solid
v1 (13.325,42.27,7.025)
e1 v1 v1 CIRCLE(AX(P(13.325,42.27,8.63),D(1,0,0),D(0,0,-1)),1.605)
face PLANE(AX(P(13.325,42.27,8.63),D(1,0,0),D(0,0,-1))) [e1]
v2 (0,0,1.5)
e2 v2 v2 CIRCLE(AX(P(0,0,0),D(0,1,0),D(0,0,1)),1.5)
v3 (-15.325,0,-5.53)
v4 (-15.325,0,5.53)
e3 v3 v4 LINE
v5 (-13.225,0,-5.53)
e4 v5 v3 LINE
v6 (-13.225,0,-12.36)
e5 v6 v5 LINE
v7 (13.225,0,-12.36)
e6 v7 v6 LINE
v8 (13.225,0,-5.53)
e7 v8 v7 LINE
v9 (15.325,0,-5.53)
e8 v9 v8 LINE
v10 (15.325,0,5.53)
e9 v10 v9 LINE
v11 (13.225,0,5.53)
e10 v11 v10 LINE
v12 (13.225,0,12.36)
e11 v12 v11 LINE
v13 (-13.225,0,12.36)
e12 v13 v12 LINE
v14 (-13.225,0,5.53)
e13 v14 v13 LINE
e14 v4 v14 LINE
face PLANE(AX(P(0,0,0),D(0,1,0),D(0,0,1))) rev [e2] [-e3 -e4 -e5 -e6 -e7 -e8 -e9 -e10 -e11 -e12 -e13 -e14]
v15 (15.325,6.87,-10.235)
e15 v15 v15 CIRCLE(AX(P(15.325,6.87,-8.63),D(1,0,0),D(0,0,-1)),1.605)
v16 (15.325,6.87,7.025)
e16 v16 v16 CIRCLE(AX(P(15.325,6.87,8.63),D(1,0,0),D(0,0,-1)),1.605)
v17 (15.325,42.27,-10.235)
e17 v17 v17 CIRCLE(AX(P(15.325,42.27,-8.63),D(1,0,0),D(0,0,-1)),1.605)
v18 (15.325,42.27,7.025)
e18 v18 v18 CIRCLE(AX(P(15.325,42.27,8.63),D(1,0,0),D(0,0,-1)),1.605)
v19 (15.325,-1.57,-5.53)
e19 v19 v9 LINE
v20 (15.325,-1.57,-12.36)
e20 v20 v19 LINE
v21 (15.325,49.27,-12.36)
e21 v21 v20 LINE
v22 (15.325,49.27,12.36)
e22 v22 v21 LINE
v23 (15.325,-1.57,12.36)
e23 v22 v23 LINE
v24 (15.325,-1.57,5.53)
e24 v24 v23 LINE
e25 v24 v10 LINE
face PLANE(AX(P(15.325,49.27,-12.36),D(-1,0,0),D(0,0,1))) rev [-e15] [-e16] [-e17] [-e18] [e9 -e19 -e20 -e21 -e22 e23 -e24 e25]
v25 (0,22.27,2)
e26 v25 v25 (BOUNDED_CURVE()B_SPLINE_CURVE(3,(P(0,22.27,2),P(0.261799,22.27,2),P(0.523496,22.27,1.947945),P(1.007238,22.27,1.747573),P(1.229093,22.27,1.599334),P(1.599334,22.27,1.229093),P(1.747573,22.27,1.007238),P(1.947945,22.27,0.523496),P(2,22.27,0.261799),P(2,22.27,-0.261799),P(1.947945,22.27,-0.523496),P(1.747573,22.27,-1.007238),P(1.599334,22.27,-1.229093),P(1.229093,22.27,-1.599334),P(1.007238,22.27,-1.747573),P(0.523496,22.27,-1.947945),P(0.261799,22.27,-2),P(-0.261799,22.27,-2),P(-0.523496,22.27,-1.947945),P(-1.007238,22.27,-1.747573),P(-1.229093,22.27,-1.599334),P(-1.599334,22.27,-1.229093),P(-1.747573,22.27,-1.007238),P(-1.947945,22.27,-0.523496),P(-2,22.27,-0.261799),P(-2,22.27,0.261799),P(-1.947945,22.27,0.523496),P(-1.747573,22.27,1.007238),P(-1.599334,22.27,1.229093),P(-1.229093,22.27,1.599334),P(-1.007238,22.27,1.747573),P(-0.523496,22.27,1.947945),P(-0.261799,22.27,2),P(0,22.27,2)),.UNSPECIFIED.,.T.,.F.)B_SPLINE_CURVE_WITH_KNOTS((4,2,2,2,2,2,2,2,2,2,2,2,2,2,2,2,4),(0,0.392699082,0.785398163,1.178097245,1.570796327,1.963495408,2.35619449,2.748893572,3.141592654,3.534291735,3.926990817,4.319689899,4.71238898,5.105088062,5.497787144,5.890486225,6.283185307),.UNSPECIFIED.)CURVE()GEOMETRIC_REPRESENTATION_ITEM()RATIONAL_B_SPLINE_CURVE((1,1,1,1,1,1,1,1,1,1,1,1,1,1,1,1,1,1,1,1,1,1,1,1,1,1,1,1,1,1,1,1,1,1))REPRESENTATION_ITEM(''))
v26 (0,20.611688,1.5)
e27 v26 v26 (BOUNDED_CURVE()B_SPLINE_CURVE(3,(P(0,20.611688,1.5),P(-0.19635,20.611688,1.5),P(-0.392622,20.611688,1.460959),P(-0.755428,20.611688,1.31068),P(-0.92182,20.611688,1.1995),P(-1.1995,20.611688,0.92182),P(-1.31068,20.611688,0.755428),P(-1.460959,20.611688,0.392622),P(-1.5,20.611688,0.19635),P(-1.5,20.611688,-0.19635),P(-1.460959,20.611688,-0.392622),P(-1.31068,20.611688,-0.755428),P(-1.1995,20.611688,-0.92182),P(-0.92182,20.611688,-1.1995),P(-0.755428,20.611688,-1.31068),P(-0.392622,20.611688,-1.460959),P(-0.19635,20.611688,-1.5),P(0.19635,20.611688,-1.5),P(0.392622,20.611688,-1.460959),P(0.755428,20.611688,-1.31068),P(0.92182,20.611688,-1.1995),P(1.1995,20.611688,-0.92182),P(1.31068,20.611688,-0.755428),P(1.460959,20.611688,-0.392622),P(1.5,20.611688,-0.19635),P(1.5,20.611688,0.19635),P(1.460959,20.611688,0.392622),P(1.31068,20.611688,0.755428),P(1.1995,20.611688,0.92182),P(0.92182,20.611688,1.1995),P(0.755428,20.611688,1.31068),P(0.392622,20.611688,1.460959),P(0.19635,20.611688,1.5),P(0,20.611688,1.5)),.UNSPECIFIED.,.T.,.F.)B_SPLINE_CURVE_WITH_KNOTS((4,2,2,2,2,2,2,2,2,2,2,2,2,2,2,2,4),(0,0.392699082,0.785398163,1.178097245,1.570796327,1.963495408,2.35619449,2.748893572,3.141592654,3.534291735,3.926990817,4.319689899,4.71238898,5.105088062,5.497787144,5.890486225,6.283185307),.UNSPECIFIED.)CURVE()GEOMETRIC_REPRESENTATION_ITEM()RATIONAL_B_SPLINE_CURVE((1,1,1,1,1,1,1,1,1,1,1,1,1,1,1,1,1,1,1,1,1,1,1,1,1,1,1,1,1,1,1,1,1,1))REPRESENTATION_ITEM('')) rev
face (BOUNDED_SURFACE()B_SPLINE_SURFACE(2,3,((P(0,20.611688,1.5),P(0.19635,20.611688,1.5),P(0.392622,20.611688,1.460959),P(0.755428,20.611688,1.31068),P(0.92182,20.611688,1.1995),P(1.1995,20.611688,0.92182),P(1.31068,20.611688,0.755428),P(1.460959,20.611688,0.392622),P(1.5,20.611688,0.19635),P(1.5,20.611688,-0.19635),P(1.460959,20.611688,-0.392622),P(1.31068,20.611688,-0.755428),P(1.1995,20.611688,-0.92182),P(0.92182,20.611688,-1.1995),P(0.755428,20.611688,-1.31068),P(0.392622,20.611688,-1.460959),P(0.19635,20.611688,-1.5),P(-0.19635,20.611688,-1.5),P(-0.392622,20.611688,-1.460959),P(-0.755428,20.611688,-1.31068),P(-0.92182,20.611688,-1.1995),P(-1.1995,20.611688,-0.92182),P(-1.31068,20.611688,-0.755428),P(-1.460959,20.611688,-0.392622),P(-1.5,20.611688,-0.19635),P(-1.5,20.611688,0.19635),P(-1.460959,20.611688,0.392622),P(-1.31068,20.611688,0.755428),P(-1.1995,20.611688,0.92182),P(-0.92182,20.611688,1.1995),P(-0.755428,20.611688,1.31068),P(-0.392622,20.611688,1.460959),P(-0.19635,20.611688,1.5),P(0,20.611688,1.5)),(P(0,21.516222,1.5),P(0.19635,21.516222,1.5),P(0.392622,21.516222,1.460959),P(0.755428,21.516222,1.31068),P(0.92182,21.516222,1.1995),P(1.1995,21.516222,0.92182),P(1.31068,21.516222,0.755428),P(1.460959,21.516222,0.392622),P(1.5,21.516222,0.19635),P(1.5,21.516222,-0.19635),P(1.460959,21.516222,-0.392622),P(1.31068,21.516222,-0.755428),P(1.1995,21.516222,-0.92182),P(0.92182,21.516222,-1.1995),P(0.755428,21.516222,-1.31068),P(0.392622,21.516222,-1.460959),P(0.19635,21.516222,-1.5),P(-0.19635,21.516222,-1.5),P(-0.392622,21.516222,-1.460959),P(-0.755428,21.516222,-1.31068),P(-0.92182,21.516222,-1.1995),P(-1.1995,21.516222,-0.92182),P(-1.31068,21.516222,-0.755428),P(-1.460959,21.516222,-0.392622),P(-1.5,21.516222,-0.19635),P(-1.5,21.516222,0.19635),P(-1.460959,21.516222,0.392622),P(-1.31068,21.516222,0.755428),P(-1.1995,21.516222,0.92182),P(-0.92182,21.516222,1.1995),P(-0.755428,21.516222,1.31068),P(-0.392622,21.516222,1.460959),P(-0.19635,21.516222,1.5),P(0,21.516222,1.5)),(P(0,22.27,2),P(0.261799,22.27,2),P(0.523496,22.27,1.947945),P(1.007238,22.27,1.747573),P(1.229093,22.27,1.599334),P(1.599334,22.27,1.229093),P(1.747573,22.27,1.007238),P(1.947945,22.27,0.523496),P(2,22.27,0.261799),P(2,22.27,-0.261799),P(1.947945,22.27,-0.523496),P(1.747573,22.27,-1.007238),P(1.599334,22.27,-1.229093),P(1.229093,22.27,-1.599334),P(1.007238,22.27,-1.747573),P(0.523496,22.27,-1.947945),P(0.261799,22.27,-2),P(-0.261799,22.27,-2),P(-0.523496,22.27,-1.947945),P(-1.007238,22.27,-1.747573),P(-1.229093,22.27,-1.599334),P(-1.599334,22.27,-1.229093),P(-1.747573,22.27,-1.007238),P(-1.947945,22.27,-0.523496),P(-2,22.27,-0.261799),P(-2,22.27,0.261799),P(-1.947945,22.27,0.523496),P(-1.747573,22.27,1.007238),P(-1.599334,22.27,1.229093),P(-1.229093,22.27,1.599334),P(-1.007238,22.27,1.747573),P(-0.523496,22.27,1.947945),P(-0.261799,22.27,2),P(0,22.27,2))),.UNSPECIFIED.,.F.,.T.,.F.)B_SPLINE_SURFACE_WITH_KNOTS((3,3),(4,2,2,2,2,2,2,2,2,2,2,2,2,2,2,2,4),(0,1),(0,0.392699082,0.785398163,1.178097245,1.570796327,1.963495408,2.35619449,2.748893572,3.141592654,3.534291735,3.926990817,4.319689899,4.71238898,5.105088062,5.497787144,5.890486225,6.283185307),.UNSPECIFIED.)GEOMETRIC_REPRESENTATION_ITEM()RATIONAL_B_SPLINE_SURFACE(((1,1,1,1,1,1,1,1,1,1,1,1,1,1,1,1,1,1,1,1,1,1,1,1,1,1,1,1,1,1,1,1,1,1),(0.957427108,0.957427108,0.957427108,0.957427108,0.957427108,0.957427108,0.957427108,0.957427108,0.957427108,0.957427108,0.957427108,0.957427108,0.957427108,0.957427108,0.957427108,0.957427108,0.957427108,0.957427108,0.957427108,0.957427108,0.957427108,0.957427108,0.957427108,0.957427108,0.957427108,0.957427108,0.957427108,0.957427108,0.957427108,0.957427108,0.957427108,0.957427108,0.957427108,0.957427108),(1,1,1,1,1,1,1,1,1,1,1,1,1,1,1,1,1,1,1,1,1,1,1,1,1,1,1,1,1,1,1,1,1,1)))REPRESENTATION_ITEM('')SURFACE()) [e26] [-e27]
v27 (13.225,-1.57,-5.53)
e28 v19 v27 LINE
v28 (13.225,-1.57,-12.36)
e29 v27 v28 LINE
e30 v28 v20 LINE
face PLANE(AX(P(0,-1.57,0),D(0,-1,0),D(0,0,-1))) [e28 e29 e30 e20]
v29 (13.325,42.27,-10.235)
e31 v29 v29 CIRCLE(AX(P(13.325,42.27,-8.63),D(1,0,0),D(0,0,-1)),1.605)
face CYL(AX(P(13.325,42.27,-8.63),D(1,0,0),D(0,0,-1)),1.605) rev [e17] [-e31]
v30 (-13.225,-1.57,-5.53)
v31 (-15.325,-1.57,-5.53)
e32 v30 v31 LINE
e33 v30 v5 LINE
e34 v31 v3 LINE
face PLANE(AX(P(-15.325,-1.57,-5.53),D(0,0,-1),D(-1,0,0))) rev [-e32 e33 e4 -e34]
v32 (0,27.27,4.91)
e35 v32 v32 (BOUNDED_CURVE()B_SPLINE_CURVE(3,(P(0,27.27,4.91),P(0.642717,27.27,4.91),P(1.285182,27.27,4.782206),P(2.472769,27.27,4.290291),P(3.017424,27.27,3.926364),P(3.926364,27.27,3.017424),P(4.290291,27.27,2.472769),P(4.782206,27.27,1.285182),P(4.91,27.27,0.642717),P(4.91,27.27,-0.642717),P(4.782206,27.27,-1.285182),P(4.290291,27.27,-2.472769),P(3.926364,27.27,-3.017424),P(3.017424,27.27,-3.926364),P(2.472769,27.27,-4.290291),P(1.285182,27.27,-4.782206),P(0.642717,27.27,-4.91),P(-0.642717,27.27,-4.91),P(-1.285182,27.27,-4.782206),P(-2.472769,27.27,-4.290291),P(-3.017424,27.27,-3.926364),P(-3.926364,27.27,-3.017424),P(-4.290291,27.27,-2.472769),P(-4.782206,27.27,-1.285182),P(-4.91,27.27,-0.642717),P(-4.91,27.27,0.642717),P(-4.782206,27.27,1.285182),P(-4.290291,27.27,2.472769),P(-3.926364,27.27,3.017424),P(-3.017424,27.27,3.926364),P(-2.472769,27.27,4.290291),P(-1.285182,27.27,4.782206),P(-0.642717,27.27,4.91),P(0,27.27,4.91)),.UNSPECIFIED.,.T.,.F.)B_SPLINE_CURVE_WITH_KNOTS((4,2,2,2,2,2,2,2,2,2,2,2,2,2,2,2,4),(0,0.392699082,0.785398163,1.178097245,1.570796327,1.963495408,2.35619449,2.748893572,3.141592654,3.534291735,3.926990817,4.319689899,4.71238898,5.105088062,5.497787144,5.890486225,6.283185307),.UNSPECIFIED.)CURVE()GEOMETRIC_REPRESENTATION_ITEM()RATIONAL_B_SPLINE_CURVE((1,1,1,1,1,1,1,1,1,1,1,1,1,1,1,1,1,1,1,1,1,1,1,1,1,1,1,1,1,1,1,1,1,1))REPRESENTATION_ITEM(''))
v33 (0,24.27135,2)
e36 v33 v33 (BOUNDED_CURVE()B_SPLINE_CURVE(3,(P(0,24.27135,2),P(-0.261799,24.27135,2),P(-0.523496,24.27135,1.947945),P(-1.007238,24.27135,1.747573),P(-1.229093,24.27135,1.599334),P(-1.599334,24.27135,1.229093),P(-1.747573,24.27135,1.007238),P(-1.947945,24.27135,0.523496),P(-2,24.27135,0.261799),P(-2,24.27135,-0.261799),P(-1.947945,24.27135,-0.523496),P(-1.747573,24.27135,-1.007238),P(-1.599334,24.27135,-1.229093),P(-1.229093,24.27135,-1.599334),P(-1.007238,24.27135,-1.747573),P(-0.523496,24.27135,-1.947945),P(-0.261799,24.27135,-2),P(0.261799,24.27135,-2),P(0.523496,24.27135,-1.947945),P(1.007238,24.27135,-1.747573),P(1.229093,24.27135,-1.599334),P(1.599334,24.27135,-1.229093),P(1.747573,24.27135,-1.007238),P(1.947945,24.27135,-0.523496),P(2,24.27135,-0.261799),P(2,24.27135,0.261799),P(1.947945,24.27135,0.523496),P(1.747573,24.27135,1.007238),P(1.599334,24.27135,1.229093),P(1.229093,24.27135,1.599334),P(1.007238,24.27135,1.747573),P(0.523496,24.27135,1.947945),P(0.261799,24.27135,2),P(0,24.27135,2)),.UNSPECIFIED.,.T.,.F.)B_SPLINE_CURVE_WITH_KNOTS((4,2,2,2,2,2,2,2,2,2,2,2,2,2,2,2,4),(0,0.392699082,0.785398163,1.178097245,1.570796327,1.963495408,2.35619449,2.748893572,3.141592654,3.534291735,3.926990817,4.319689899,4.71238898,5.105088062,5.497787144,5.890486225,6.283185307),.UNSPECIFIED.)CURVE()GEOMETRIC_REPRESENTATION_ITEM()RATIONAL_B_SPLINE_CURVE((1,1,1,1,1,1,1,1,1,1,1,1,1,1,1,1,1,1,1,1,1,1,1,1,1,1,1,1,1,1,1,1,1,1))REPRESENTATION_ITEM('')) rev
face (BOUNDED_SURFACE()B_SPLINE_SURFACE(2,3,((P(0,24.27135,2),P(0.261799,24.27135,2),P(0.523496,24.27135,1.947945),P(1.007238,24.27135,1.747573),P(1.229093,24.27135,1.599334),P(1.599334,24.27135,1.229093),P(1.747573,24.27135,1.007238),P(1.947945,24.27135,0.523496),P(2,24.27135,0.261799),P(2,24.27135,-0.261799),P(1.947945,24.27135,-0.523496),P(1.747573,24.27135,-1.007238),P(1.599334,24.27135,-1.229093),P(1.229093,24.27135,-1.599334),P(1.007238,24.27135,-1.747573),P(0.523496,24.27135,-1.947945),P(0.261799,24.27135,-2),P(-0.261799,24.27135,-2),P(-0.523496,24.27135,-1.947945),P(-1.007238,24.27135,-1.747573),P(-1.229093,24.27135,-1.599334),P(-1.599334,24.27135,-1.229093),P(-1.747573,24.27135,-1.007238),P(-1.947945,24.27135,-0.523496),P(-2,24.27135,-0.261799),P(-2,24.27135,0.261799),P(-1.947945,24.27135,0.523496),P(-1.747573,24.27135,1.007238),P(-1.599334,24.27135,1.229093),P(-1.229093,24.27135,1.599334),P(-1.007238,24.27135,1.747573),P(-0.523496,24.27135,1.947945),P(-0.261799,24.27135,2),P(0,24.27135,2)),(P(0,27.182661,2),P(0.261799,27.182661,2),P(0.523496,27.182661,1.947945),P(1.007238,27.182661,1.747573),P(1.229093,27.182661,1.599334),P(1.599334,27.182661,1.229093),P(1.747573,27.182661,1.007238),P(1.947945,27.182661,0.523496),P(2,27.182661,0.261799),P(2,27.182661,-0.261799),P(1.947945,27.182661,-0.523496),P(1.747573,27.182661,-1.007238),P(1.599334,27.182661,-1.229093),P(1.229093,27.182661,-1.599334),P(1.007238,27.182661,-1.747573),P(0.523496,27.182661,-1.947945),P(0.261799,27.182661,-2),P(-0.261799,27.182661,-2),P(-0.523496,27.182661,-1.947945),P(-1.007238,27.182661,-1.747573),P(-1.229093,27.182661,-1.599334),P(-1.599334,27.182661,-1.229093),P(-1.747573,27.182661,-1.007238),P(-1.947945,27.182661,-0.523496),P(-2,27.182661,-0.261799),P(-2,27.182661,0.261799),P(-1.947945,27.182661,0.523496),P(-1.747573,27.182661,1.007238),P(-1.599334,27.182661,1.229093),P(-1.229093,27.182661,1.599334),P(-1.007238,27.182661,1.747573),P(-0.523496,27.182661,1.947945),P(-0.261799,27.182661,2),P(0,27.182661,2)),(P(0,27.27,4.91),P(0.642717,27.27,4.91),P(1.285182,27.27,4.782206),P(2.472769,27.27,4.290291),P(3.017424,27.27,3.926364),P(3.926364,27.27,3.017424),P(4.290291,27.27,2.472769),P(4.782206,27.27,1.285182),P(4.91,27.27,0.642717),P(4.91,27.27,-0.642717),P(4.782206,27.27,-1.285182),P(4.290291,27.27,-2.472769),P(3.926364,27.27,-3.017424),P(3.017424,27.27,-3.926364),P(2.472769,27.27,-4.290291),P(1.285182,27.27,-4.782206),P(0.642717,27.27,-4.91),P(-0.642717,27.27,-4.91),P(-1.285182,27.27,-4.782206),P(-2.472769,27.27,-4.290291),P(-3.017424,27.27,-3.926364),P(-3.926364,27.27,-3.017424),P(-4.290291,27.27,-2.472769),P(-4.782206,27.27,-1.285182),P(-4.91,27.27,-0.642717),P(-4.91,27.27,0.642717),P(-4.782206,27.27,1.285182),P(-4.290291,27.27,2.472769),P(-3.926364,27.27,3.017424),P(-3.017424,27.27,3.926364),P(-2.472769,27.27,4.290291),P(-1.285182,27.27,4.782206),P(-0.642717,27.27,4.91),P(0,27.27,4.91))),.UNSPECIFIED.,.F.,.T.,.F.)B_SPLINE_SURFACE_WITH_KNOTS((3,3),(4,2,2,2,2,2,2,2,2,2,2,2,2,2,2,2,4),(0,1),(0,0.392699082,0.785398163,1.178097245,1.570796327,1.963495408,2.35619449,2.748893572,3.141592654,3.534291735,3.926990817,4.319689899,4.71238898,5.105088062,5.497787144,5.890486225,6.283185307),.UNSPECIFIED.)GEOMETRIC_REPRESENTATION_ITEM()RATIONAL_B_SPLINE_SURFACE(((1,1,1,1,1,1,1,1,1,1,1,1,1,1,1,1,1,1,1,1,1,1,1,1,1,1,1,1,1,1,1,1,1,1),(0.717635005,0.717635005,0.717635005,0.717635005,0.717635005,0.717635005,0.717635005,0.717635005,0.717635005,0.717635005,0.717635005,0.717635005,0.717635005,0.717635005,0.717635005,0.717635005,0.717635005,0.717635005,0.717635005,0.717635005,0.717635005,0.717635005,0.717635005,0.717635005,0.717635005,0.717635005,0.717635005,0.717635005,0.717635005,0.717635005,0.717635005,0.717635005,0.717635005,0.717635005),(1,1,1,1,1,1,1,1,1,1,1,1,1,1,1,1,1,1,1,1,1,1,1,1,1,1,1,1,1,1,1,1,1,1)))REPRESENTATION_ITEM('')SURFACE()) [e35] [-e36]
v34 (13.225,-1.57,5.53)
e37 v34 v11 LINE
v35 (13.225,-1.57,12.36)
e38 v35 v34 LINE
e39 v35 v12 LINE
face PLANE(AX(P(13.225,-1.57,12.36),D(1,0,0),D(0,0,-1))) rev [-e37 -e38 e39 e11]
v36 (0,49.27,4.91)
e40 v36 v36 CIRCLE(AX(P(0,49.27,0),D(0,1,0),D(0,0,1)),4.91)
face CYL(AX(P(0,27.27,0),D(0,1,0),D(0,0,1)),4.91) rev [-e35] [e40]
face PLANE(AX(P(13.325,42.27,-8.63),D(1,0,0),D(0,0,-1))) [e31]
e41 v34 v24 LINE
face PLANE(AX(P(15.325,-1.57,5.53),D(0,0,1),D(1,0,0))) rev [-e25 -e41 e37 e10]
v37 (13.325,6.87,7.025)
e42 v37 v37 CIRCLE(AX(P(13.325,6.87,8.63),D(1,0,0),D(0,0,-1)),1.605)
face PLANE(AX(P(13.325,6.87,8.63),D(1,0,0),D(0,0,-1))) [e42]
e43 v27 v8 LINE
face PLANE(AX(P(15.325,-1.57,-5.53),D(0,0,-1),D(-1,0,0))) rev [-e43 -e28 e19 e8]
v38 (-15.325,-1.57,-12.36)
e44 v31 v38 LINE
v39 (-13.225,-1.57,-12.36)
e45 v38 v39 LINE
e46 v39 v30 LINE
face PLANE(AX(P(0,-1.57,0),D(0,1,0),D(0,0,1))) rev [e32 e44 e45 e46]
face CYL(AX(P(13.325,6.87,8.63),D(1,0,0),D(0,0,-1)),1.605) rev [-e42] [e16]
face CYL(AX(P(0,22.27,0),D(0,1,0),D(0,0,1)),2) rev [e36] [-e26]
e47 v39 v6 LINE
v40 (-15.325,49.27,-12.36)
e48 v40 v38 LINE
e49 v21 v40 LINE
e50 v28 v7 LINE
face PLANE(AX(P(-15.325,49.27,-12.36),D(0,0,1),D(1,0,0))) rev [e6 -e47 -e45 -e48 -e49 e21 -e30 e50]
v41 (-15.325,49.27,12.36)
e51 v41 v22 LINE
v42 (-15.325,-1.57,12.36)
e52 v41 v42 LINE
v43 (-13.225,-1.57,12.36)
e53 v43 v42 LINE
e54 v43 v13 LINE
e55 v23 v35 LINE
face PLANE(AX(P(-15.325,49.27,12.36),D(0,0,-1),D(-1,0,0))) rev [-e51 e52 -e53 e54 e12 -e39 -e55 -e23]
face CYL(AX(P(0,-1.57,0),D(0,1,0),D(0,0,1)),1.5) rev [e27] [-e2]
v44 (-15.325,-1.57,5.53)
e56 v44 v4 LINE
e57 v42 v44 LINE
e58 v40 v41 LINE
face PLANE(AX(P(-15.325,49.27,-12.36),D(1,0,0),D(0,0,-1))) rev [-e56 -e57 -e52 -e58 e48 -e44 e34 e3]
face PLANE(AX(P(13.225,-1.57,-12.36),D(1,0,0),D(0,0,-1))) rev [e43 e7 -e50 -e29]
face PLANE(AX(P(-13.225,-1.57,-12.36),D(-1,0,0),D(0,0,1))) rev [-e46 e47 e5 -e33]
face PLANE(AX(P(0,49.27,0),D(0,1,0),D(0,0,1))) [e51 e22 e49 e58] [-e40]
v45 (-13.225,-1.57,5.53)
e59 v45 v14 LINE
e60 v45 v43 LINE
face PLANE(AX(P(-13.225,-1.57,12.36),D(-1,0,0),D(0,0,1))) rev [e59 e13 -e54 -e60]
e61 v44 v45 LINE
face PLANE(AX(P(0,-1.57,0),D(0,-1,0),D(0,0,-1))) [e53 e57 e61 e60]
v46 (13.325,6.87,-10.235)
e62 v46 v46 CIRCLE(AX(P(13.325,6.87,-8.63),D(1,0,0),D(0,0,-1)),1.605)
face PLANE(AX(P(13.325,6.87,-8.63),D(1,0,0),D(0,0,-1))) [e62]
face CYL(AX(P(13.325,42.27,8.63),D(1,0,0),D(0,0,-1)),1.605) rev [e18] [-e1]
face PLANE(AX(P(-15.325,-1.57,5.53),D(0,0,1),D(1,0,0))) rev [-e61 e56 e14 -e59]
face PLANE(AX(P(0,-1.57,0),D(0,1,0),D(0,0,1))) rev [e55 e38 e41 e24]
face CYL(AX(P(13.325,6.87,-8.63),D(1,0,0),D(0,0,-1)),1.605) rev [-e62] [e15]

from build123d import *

# Parameters (mm, degrees)
BOSS_EXTRUDE1_DEPTH = 49.27
SKETCH12_W          = 2.099999999999998
SKETCH12_H          = 6.83
SKETCH12_W_2        = 2.0999999999999996
SKETCH12_H_2        = 6.829999999999998
SKETCH12_W_3        = 2.1000000000000014
BOSS_EXTRUDE2_DEPTH = 1.57
SKETCH4_R           = 4.91
CUT_EXTRUDE3_DEPTH  = 22
SKETCH5_R           = 2
CUT_EXTRUDE4_DEPTH  = 5
SKETCH7_R           = 1.5
CUT_EXTRUDE5_DEPTH  = 34.41594267711148
FILLET4_R           = 3
FILLET5_R           = 3
SKETCH13_R          = 1.6049999999999995
SKETCH13_R_2        = 1.6049999999999962
SKETCH13_R_3        = 1.605
CUT_EXTRUDE6_DEPTH  = 2


with BuildPart() as part:
    # Sketch2 → Boss-Extrude1 (new body)
    with BuildSketch(Plane(origin=(0, 0, 0), x_dir=(1, 0, 0), z_dir=(0, 1, 0))):
        Polygon((-15.325000000000001, 12.36), (15.324999999999998, 12.36), (15.325, -12.360000000000003), (-15.324999999999996, -12.360000000000003), align=None)
    extrude(amount=BOSS_EXTRUDE1_DEPTH)

    # Sketch12 → Boss-Extrude2 (add)
    with BuildSketch(Plane.XZ):
        with Locations((-14.274999999999997, 8.945000000000004)):
            Rectangle(SKETCH12_W, SKETCH12_H)
        with Locations((-14.275000000000002, -8.944999999999999)):
            Rectangle(SKETCH12_W_2, SKETCH12_H_2)
        with Locations((14.274999999999999, 8.945000000000004)):
            Rectangle(SKETCH12_W_3, SKETCH12_H)
        with Locations((14.274999999999999, -8.944999999999999)):
            Rectangle(SKETCH12_W_3, SKETCH12_H_2)
    extrude(amount=BOSS_EXTRUDE2_DEPTH)

    # Sketch4 → Cut-Extrude3 (cut)
    with BuildSketch(Plane(origin=(0, 49.27, 0), x_dir=(1, 0, 0), z_dir=(0, 1, 0))):
        with Locations(Location((0, 0, 0), (0, 0, 270))):
            Circle(SKETCH4_R)
    extrude(amount=-CUT_EXTRUDE3_DEPTH, mode=Mode.SUBTRACT)

    # Sketch5 → Cut-Extrude4 (cut)
    with BuildSketch(Plane(origin=(0, 27.270000000000003, 0), x_dir=(1, 0, 0), z_dir=(0, 1, 0))):
        with Locations(Location((0, 0, 0), (0, 0, 270))):
            Circle(SKETCH5_R)
    extrude(amount=-CUT_EXTRUDE4_DEPTH, mode=Mode.SUBTRACT)

    # Sketch7 → Cut-Extrude5 (cut, through all)
    with BuildSketch(Plane(origin=(0, 22.270000000000003, 0), x_dir=(1, 0, 0), z_dir=(0, 1, 0))):
        with Locations(Location((0, 0, 0), (0, 0, 270))):
            Circle(SKETCH7_R)
    extrude(amount=-CUT_EXTRUDE5_DEPTH, mode=Mode.SUBTRACT)

    # Fillet4
    # the kernel refuses this fillet: 3 mm, written as the material it takes off along each edge
    with BuildSketch(Plane(origin=(0, 27.270000000000003, 0), x_dir=(-1.8e-16, 0, 1), z_dir=(-1, 0, -1.8e-16))) as fillet4_piece_1:
        with BuildLine():
            CenterArc((5, -2.9986496961132367), FILLET4_R, 91.7191313208778, 88.2808686791222)
            Line((2, -2.9986496961132367), (1.94, -2.9986496961132367))
            Line((1.94, -2.9986496961132367), (1.94, 0))
            Line((1.94, 0), (2, 0.05999999999999872))
            ThreePointArc((2, 0.05999999999999872), (3.455, 0.05999999999999872), (4.9082, 0.05997299392226552))
            Line((4.9082, 0.05997299392226552), (4.91, 0))
        make_face()
    revolve(axis=Axis((0, 27.270000000000003, 0), (0, 1, 0)), mode=Mode.SUBTRACT)

    # Fillet5
    # the kernel refuses this fillet: 3 mm, written as the material it takes off along each edge
    with BuildSketch(Plane(origin=(0, 22.270000000000003, 0), x_dir=(-1.8e-16, 0, 1), z_dir=(-1, 0, -1.8e-16))) as fillet5_piece_1:
        with BuildLine():
            CenterArc((4.5, -1.6583123951831418), FILLET5_R, 146.44269023799268, 33.55730976200732)
            Line((2.0000000000025064, -1.66267e-12), (1.9500000000025566, 0.03316624790196698))
            ThreePointArc((1.9500000000025566, 0.03316624790196698), (1.7500000000012532, 0.05999999999999872), (1.5, 0.05999999999999872))
            Line((1.5, 0.05999999999999872), (1.44, 0))
            Line((1.44, 0), (1.44, -1.6583123951831418))
            Line((1.44, -1.6583123951831418), (1.5, -1.6583123951831418))
        make_face()
    revolve(axis=Axis((0, 22.270000000000003, 0), (0, 1, 0)), mode=Mode.SUBTRACT)

    # Sketch13 → Cut-Extrude6 (cut)
    with BuildSketch(Plane(origin=(15.324999999999998, 0, -1.08e-15), x_dir=(-7e-17, 0, -1), z_dir=(1, 0, -7e-17))):
        with Locations((-8.630000000000006, 42.27)):
            Circle(SKETCH13_R)
        with Locations((8.629999999999999, 42.27)):
            Circle(SKETCH13_R_2)
        with Locations((-8.630000000000006, 6.870000000000001)):
            Circle(SKETCH13_R_3)
        with Locations((8.629999999999999, 6.870000000000001)):
            Circle(SKETCH13_R_3)
    extrude(amount=-CUT_EXTRUDE6_DEPTH, mode=Mode.SUBTRACT)


solid = part.part
